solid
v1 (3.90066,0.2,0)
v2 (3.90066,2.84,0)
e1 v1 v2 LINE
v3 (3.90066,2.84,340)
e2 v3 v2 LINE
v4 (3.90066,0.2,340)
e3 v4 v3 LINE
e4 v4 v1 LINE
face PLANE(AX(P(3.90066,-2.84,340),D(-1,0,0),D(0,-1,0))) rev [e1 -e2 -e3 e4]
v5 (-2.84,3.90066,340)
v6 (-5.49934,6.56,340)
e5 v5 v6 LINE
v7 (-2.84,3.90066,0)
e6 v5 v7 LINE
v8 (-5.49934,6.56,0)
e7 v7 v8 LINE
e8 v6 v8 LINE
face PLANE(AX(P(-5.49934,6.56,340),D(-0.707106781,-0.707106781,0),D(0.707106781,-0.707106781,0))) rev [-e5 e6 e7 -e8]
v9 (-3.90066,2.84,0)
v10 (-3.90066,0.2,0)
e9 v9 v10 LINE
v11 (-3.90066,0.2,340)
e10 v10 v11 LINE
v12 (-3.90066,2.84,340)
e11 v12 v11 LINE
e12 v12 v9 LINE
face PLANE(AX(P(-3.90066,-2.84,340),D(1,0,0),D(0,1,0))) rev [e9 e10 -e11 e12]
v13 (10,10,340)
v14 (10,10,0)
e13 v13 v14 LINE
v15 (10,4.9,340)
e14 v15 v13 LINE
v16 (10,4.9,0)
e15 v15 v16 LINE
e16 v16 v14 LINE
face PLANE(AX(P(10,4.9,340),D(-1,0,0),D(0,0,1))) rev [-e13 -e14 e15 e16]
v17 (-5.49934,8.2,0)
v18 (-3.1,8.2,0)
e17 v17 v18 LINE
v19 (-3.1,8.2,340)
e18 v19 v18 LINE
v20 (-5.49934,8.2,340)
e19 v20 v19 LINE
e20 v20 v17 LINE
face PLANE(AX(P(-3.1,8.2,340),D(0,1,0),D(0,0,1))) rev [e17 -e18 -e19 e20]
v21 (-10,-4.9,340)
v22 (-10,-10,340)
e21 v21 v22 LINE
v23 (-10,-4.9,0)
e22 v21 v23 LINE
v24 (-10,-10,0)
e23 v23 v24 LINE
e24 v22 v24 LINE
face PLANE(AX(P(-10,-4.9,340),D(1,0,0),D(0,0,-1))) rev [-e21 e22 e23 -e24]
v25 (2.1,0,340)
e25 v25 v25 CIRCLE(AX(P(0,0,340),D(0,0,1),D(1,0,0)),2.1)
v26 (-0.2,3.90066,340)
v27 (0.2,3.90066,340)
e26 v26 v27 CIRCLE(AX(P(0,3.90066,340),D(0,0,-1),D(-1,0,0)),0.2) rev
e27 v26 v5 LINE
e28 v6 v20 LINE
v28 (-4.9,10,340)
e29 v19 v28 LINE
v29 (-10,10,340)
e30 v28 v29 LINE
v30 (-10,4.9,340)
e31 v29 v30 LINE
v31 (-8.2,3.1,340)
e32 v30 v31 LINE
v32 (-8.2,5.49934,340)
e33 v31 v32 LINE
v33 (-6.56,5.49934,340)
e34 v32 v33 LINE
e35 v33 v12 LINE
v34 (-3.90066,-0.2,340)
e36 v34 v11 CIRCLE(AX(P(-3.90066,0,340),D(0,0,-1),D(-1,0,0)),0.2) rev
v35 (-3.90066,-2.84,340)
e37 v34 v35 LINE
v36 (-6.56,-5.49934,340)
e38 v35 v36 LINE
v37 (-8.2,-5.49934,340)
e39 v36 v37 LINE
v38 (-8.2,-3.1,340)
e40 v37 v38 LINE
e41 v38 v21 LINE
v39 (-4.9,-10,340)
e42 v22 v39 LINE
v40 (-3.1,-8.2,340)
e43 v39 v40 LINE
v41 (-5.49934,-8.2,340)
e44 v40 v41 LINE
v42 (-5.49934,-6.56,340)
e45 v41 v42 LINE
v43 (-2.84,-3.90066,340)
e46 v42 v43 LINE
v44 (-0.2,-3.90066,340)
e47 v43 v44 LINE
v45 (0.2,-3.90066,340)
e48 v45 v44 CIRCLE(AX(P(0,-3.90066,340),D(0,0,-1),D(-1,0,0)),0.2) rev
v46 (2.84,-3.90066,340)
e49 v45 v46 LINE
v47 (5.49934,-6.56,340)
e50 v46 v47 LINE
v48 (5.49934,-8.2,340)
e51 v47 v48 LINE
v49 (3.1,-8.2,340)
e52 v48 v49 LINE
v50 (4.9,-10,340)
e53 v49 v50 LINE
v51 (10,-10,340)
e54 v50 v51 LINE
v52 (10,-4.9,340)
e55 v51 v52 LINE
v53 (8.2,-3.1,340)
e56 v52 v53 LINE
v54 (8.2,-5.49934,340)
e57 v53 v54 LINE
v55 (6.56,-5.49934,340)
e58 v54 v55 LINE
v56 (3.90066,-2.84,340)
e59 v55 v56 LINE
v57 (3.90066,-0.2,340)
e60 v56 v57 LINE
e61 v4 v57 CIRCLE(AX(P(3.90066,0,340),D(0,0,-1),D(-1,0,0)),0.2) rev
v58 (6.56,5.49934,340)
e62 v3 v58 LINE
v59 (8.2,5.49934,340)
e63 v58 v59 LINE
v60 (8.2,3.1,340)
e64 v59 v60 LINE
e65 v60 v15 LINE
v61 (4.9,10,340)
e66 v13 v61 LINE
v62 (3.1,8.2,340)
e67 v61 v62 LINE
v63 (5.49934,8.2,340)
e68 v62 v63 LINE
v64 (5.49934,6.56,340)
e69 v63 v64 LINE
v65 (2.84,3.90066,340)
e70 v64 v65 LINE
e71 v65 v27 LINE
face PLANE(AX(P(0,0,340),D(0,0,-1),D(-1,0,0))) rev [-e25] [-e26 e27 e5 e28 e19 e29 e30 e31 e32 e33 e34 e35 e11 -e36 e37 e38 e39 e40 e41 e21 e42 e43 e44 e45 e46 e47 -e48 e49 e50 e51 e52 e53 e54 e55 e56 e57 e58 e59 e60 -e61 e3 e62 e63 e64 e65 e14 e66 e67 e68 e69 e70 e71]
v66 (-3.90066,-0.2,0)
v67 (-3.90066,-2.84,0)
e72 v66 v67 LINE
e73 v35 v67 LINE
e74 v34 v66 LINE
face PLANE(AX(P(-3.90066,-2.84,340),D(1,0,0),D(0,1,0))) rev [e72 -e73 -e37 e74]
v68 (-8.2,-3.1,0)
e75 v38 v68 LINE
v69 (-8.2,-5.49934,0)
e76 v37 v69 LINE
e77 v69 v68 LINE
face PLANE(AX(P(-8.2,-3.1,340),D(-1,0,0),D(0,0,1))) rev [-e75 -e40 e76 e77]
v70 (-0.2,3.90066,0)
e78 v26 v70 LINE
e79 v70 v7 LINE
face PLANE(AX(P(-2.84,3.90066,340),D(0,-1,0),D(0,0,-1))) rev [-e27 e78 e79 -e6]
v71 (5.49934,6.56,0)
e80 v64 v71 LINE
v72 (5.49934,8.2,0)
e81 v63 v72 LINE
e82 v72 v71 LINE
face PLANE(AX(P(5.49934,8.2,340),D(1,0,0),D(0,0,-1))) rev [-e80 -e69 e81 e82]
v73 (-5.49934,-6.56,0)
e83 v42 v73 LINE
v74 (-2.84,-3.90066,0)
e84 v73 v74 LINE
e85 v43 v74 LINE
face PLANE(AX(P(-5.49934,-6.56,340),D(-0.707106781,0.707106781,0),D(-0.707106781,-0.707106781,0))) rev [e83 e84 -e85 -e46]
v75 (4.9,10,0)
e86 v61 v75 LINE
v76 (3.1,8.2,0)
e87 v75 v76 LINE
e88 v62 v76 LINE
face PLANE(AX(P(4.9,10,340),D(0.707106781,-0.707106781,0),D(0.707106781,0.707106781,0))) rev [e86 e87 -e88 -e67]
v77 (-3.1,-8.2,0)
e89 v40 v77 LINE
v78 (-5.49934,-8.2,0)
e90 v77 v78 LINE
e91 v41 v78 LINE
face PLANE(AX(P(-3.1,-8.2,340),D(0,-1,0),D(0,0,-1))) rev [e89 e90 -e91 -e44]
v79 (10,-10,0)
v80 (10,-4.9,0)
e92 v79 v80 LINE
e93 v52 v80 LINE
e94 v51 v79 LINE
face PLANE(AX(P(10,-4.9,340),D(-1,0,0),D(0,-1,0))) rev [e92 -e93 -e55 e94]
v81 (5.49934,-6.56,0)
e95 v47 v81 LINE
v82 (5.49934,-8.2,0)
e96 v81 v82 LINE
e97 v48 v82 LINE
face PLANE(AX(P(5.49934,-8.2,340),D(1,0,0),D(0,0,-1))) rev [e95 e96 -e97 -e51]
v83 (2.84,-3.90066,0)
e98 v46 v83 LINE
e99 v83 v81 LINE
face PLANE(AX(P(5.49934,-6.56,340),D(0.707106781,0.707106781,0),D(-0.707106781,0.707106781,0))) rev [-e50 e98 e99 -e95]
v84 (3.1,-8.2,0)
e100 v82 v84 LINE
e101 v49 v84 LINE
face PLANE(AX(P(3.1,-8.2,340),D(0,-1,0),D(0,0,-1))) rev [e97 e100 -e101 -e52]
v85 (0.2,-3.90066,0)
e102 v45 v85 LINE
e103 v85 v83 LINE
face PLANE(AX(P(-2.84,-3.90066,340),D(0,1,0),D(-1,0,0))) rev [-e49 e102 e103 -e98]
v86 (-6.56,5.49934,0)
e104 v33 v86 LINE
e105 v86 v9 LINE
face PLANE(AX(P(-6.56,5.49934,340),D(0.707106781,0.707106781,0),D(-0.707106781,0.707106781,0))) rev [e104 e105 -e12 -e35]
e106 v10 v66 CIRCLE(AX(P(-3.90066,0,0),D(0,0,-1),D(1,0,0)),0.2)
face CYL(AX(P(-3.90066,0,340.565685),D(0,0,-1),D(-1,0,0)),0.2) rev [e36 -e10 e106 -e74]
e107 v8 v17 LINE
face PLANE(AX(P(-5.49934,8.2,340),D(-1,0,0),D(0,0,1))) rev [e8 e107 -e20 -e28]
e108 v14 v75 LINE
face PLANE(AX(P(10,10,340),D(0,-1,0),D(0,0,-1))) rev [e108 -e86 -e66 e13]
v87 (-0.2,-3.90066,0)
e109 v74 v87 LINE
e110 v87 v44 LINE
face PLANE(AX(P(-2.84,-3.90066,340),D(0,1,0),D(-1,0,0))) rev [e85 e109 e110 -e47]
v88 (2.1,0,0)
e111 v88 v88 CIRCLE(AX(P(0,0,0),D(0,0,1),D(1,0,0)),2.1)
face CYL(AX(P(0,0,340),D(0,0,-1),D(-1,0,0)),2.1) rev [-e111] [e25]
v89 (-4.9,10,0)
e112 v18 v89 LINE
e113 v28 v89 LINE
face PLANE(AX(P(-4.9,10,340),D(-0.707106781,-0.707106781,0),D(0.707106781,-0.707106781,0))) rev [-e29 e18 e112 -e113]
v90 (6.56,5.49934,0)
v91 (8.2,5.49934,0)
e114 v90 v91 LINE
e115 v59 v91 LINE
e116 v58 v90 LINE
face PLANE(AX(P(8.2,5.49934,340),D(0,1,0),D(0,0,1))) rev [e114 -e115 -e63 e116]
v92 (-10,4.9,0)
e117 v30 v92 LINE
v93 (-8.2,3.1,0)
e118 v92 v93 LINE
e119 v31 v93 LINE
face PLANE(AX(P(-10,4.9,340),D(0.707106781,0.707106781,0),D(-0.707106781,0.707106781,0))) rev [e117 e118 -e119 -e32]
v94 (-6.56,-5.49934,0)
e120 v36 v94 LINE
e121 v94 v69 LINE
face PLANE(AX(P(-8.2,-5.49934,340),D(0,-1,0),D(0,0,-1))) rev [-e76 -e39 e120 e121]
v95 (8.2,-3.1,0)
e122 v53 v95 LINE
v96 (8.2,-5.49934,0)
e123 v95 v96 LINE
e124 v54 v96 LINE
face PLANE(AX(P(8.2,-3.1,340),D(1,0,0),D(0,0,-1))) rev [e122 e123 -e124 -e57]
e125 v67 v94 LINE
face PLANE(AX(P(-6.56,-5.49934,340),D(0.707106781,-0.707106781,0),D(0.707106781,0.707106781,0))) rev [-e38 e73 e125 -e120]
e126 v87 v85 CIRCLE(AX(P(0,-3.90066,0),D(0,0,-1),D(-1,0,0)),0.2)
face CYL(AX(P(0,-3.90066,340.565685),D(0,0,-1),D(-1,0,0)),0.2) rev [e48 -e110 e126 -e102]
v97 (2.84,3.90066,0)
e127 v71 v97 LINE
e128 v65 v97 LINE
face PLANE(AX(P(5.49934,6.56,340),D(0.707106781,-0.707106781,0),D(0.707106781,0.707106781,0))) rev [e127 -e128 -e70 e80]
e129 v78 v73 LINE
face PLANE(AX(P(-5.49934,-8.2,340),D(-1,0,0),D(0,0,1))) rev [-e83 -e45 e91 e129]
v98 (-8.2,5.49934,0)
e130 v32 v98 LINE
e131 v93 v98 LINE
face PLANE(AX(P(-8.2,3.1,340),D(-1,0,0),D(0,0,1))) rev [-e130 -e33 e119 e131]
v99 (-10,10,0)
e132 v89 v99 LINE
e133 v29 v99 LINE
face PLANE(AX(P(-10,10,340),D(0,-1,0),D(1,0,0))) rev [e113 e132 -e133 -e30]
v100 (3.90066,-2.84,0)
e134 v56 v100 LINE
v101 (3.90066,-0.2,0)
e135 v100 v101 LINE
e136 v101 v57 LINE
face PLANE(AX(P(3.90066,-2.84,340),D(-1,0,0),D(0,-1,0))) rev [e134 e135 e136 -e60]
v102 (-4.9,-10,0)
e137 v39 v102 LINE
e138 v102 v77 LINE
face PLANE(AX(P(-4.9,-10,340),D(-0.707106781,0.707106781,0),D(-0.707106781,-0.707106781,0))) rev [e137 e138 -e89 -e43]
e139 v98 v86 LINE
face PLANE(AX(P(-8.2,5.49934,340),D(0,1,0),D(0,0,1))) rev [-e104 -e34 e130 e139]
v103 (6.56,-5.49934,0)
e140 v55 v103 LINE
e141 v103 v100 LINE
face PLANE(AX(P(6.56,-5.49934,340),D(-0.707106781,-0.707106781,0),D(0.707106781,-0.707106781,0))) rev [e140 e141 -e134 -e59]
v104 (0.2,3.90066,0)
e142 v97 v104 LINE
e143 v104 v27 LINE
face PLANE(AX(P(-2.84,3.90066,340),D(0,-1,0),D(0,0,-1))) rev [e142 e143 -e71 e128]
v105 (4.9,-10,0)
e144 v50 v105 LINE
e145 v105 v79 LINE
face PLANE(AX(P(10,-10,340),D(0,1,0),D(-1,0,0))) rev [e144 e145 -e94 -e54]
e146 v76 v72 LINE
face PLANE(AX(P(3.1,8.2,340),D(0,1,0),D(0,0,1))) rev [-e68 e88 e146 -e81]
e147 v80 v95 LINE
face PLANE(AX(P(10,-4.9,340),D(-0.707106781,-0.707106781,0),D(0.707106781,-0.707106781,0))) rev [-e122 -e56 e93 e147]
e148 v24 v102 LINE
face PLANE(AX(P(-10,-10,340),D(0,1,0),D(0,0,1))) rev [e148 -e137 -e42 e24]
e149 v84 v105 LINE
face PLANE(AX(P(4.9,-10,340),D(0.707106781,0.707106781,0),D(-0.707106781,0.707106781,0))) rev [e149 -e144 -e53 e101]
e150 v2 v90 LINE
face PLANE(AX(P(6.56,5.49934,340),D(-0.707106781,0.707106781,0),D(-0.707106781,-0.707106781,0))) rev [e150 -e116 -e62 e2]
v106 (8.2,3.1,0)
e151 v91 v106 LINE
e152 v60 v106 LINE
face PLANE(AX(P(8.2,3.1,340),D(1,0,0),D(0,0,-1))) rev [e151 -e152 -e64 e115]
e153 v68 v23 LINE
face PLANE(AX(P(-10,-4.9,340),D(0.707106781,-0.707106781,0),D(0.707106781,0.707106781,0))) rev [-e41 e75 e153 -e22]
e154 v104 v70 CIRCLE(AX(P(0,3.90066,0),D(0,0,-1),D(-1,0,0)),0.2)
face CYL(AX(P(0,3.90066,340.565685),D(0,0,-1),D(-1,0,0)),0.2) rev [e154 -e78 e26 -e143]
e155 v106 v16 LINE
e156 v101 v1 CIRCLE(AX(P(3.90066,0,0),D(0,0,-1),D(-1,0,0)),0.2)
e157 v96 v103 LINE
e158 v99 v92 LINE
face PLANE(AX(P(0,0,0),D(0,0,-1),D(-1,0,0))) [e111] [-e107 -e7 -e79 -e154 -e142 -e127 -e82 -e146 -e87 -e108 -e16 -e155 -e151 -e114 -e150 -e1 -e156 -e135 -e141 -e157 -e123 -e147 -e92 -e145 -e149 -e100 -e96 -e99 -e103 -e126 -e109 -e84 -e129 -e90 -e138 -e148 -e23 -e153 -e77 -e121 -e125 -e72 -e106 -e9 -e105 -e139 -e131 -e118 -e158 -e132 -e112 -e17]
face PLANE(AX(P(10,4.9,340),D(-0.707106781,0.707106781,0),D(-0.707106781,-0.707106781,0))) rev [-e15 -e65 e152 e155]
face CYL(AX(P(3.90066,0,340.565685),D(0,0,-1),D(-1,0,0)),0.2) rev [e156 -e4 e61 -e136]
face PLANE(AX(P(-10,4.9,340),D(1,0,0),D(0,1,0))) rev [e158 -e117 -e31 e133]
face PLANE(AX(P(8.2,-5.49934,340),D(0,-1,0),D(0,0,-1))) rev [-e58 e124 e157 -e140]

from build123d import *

# Parameters (mm, degrees)
SKETCH1_R           = 2.1
BOSS_EXTRUDE1_DEPTH = 340
CUT_EXTRUDE1_DEPTH  = 340


# Read off the part's stored shape, not the designer's step: Cut-Extrude1
with BuildPart() as part:
    # Sketch1 → Boss-Extrude1 (new body)
    with BuildSketch(Plane.XY):
        Polygon((-10, -4.9), (-10, -10), (-4.9, -10), (-3.1, -8.2), (-5.499339828, -8.2), (-5.499339828, -6.56), (-2.84, -3.900660172), (2.84, -3.900660172), (5.499339828, -6.56), (5.499339828, -8.2), (3.1, -8.2), (4.9, -10), (10, -10), (10, -4.9), (8.2, -3.1), (8.2, -5.499339828), (6.56, -5.499339828), (3.900660172, -2.84), (3.900660172, 2.84), (6.56, 5.499339828), (8.2, 5.499339828), (8.2, 3.1), (10, 4.9), (10, 10), (4.9, 10), (3.1, 8.2), (5.499339828, 8.2), (5.499339828, 6.56), (2.84, 3.900660172), (-2.84, 3.900660172), (-5.499339828, 6.56), (-5.499339828, 8.2), (-3.1, 8.2), (-4.9, 10), (-10, 10), (-10, 4.9), (-8.2, 3.1), (-8.2, 5.499339828), (-6.56, 5.499339828), (-3.900660172, 2.84), (-3.900660172, -2.84), (-6.56, -5.499339828), (-8.2, -5.499339828), (-8.2, -3.1), align=None)
        Circle(SKETCH1_R, mode=Mode.SUBTRACT)
    extrude(amount=BOSS_EXTRUDE1_DEPTH)

    # Cut-Extrude1 outline → Cut-Extrude1 (cut)
    with BuildSketch(Plane.XY):
        with BuildLine():
            ThreePointArc((-3.900660172, -0.2), (-3.700660172, 0), (-3.900660172, 0.2))
            Line((-3.900660172, 0.2), (-3.900660172, -0.2))
        make_face()
        with BuildLine():
            ThreePointArc((-0.2, 3.900660172), (0, 3.700660172), (0.2, 3.900660172))
            Line((0.2, 3.900660172), (-0.2, 3.900660172))
        make_face()
        with BuildLine():
            ThreePointArc((3.900660172, 0.2), (3.700660172, 0), (3.900660172, -0.2))
            Line((3.900660172, -0.2), (3.900660172, 0.2))
        make_face()
        with BuildLine():
            ThreePointArc((0.2, -3.900660172), (0, -3.700660172), (-0.2, -3.900660172))
            Line((-0.2, -3.900660172), (0.2, -3.900660172))
        make_face()
    extrude(amount=CUT_EXTRUDE1_DEPTH, mode=Mode.SUBTRACT)


solid = part.part
